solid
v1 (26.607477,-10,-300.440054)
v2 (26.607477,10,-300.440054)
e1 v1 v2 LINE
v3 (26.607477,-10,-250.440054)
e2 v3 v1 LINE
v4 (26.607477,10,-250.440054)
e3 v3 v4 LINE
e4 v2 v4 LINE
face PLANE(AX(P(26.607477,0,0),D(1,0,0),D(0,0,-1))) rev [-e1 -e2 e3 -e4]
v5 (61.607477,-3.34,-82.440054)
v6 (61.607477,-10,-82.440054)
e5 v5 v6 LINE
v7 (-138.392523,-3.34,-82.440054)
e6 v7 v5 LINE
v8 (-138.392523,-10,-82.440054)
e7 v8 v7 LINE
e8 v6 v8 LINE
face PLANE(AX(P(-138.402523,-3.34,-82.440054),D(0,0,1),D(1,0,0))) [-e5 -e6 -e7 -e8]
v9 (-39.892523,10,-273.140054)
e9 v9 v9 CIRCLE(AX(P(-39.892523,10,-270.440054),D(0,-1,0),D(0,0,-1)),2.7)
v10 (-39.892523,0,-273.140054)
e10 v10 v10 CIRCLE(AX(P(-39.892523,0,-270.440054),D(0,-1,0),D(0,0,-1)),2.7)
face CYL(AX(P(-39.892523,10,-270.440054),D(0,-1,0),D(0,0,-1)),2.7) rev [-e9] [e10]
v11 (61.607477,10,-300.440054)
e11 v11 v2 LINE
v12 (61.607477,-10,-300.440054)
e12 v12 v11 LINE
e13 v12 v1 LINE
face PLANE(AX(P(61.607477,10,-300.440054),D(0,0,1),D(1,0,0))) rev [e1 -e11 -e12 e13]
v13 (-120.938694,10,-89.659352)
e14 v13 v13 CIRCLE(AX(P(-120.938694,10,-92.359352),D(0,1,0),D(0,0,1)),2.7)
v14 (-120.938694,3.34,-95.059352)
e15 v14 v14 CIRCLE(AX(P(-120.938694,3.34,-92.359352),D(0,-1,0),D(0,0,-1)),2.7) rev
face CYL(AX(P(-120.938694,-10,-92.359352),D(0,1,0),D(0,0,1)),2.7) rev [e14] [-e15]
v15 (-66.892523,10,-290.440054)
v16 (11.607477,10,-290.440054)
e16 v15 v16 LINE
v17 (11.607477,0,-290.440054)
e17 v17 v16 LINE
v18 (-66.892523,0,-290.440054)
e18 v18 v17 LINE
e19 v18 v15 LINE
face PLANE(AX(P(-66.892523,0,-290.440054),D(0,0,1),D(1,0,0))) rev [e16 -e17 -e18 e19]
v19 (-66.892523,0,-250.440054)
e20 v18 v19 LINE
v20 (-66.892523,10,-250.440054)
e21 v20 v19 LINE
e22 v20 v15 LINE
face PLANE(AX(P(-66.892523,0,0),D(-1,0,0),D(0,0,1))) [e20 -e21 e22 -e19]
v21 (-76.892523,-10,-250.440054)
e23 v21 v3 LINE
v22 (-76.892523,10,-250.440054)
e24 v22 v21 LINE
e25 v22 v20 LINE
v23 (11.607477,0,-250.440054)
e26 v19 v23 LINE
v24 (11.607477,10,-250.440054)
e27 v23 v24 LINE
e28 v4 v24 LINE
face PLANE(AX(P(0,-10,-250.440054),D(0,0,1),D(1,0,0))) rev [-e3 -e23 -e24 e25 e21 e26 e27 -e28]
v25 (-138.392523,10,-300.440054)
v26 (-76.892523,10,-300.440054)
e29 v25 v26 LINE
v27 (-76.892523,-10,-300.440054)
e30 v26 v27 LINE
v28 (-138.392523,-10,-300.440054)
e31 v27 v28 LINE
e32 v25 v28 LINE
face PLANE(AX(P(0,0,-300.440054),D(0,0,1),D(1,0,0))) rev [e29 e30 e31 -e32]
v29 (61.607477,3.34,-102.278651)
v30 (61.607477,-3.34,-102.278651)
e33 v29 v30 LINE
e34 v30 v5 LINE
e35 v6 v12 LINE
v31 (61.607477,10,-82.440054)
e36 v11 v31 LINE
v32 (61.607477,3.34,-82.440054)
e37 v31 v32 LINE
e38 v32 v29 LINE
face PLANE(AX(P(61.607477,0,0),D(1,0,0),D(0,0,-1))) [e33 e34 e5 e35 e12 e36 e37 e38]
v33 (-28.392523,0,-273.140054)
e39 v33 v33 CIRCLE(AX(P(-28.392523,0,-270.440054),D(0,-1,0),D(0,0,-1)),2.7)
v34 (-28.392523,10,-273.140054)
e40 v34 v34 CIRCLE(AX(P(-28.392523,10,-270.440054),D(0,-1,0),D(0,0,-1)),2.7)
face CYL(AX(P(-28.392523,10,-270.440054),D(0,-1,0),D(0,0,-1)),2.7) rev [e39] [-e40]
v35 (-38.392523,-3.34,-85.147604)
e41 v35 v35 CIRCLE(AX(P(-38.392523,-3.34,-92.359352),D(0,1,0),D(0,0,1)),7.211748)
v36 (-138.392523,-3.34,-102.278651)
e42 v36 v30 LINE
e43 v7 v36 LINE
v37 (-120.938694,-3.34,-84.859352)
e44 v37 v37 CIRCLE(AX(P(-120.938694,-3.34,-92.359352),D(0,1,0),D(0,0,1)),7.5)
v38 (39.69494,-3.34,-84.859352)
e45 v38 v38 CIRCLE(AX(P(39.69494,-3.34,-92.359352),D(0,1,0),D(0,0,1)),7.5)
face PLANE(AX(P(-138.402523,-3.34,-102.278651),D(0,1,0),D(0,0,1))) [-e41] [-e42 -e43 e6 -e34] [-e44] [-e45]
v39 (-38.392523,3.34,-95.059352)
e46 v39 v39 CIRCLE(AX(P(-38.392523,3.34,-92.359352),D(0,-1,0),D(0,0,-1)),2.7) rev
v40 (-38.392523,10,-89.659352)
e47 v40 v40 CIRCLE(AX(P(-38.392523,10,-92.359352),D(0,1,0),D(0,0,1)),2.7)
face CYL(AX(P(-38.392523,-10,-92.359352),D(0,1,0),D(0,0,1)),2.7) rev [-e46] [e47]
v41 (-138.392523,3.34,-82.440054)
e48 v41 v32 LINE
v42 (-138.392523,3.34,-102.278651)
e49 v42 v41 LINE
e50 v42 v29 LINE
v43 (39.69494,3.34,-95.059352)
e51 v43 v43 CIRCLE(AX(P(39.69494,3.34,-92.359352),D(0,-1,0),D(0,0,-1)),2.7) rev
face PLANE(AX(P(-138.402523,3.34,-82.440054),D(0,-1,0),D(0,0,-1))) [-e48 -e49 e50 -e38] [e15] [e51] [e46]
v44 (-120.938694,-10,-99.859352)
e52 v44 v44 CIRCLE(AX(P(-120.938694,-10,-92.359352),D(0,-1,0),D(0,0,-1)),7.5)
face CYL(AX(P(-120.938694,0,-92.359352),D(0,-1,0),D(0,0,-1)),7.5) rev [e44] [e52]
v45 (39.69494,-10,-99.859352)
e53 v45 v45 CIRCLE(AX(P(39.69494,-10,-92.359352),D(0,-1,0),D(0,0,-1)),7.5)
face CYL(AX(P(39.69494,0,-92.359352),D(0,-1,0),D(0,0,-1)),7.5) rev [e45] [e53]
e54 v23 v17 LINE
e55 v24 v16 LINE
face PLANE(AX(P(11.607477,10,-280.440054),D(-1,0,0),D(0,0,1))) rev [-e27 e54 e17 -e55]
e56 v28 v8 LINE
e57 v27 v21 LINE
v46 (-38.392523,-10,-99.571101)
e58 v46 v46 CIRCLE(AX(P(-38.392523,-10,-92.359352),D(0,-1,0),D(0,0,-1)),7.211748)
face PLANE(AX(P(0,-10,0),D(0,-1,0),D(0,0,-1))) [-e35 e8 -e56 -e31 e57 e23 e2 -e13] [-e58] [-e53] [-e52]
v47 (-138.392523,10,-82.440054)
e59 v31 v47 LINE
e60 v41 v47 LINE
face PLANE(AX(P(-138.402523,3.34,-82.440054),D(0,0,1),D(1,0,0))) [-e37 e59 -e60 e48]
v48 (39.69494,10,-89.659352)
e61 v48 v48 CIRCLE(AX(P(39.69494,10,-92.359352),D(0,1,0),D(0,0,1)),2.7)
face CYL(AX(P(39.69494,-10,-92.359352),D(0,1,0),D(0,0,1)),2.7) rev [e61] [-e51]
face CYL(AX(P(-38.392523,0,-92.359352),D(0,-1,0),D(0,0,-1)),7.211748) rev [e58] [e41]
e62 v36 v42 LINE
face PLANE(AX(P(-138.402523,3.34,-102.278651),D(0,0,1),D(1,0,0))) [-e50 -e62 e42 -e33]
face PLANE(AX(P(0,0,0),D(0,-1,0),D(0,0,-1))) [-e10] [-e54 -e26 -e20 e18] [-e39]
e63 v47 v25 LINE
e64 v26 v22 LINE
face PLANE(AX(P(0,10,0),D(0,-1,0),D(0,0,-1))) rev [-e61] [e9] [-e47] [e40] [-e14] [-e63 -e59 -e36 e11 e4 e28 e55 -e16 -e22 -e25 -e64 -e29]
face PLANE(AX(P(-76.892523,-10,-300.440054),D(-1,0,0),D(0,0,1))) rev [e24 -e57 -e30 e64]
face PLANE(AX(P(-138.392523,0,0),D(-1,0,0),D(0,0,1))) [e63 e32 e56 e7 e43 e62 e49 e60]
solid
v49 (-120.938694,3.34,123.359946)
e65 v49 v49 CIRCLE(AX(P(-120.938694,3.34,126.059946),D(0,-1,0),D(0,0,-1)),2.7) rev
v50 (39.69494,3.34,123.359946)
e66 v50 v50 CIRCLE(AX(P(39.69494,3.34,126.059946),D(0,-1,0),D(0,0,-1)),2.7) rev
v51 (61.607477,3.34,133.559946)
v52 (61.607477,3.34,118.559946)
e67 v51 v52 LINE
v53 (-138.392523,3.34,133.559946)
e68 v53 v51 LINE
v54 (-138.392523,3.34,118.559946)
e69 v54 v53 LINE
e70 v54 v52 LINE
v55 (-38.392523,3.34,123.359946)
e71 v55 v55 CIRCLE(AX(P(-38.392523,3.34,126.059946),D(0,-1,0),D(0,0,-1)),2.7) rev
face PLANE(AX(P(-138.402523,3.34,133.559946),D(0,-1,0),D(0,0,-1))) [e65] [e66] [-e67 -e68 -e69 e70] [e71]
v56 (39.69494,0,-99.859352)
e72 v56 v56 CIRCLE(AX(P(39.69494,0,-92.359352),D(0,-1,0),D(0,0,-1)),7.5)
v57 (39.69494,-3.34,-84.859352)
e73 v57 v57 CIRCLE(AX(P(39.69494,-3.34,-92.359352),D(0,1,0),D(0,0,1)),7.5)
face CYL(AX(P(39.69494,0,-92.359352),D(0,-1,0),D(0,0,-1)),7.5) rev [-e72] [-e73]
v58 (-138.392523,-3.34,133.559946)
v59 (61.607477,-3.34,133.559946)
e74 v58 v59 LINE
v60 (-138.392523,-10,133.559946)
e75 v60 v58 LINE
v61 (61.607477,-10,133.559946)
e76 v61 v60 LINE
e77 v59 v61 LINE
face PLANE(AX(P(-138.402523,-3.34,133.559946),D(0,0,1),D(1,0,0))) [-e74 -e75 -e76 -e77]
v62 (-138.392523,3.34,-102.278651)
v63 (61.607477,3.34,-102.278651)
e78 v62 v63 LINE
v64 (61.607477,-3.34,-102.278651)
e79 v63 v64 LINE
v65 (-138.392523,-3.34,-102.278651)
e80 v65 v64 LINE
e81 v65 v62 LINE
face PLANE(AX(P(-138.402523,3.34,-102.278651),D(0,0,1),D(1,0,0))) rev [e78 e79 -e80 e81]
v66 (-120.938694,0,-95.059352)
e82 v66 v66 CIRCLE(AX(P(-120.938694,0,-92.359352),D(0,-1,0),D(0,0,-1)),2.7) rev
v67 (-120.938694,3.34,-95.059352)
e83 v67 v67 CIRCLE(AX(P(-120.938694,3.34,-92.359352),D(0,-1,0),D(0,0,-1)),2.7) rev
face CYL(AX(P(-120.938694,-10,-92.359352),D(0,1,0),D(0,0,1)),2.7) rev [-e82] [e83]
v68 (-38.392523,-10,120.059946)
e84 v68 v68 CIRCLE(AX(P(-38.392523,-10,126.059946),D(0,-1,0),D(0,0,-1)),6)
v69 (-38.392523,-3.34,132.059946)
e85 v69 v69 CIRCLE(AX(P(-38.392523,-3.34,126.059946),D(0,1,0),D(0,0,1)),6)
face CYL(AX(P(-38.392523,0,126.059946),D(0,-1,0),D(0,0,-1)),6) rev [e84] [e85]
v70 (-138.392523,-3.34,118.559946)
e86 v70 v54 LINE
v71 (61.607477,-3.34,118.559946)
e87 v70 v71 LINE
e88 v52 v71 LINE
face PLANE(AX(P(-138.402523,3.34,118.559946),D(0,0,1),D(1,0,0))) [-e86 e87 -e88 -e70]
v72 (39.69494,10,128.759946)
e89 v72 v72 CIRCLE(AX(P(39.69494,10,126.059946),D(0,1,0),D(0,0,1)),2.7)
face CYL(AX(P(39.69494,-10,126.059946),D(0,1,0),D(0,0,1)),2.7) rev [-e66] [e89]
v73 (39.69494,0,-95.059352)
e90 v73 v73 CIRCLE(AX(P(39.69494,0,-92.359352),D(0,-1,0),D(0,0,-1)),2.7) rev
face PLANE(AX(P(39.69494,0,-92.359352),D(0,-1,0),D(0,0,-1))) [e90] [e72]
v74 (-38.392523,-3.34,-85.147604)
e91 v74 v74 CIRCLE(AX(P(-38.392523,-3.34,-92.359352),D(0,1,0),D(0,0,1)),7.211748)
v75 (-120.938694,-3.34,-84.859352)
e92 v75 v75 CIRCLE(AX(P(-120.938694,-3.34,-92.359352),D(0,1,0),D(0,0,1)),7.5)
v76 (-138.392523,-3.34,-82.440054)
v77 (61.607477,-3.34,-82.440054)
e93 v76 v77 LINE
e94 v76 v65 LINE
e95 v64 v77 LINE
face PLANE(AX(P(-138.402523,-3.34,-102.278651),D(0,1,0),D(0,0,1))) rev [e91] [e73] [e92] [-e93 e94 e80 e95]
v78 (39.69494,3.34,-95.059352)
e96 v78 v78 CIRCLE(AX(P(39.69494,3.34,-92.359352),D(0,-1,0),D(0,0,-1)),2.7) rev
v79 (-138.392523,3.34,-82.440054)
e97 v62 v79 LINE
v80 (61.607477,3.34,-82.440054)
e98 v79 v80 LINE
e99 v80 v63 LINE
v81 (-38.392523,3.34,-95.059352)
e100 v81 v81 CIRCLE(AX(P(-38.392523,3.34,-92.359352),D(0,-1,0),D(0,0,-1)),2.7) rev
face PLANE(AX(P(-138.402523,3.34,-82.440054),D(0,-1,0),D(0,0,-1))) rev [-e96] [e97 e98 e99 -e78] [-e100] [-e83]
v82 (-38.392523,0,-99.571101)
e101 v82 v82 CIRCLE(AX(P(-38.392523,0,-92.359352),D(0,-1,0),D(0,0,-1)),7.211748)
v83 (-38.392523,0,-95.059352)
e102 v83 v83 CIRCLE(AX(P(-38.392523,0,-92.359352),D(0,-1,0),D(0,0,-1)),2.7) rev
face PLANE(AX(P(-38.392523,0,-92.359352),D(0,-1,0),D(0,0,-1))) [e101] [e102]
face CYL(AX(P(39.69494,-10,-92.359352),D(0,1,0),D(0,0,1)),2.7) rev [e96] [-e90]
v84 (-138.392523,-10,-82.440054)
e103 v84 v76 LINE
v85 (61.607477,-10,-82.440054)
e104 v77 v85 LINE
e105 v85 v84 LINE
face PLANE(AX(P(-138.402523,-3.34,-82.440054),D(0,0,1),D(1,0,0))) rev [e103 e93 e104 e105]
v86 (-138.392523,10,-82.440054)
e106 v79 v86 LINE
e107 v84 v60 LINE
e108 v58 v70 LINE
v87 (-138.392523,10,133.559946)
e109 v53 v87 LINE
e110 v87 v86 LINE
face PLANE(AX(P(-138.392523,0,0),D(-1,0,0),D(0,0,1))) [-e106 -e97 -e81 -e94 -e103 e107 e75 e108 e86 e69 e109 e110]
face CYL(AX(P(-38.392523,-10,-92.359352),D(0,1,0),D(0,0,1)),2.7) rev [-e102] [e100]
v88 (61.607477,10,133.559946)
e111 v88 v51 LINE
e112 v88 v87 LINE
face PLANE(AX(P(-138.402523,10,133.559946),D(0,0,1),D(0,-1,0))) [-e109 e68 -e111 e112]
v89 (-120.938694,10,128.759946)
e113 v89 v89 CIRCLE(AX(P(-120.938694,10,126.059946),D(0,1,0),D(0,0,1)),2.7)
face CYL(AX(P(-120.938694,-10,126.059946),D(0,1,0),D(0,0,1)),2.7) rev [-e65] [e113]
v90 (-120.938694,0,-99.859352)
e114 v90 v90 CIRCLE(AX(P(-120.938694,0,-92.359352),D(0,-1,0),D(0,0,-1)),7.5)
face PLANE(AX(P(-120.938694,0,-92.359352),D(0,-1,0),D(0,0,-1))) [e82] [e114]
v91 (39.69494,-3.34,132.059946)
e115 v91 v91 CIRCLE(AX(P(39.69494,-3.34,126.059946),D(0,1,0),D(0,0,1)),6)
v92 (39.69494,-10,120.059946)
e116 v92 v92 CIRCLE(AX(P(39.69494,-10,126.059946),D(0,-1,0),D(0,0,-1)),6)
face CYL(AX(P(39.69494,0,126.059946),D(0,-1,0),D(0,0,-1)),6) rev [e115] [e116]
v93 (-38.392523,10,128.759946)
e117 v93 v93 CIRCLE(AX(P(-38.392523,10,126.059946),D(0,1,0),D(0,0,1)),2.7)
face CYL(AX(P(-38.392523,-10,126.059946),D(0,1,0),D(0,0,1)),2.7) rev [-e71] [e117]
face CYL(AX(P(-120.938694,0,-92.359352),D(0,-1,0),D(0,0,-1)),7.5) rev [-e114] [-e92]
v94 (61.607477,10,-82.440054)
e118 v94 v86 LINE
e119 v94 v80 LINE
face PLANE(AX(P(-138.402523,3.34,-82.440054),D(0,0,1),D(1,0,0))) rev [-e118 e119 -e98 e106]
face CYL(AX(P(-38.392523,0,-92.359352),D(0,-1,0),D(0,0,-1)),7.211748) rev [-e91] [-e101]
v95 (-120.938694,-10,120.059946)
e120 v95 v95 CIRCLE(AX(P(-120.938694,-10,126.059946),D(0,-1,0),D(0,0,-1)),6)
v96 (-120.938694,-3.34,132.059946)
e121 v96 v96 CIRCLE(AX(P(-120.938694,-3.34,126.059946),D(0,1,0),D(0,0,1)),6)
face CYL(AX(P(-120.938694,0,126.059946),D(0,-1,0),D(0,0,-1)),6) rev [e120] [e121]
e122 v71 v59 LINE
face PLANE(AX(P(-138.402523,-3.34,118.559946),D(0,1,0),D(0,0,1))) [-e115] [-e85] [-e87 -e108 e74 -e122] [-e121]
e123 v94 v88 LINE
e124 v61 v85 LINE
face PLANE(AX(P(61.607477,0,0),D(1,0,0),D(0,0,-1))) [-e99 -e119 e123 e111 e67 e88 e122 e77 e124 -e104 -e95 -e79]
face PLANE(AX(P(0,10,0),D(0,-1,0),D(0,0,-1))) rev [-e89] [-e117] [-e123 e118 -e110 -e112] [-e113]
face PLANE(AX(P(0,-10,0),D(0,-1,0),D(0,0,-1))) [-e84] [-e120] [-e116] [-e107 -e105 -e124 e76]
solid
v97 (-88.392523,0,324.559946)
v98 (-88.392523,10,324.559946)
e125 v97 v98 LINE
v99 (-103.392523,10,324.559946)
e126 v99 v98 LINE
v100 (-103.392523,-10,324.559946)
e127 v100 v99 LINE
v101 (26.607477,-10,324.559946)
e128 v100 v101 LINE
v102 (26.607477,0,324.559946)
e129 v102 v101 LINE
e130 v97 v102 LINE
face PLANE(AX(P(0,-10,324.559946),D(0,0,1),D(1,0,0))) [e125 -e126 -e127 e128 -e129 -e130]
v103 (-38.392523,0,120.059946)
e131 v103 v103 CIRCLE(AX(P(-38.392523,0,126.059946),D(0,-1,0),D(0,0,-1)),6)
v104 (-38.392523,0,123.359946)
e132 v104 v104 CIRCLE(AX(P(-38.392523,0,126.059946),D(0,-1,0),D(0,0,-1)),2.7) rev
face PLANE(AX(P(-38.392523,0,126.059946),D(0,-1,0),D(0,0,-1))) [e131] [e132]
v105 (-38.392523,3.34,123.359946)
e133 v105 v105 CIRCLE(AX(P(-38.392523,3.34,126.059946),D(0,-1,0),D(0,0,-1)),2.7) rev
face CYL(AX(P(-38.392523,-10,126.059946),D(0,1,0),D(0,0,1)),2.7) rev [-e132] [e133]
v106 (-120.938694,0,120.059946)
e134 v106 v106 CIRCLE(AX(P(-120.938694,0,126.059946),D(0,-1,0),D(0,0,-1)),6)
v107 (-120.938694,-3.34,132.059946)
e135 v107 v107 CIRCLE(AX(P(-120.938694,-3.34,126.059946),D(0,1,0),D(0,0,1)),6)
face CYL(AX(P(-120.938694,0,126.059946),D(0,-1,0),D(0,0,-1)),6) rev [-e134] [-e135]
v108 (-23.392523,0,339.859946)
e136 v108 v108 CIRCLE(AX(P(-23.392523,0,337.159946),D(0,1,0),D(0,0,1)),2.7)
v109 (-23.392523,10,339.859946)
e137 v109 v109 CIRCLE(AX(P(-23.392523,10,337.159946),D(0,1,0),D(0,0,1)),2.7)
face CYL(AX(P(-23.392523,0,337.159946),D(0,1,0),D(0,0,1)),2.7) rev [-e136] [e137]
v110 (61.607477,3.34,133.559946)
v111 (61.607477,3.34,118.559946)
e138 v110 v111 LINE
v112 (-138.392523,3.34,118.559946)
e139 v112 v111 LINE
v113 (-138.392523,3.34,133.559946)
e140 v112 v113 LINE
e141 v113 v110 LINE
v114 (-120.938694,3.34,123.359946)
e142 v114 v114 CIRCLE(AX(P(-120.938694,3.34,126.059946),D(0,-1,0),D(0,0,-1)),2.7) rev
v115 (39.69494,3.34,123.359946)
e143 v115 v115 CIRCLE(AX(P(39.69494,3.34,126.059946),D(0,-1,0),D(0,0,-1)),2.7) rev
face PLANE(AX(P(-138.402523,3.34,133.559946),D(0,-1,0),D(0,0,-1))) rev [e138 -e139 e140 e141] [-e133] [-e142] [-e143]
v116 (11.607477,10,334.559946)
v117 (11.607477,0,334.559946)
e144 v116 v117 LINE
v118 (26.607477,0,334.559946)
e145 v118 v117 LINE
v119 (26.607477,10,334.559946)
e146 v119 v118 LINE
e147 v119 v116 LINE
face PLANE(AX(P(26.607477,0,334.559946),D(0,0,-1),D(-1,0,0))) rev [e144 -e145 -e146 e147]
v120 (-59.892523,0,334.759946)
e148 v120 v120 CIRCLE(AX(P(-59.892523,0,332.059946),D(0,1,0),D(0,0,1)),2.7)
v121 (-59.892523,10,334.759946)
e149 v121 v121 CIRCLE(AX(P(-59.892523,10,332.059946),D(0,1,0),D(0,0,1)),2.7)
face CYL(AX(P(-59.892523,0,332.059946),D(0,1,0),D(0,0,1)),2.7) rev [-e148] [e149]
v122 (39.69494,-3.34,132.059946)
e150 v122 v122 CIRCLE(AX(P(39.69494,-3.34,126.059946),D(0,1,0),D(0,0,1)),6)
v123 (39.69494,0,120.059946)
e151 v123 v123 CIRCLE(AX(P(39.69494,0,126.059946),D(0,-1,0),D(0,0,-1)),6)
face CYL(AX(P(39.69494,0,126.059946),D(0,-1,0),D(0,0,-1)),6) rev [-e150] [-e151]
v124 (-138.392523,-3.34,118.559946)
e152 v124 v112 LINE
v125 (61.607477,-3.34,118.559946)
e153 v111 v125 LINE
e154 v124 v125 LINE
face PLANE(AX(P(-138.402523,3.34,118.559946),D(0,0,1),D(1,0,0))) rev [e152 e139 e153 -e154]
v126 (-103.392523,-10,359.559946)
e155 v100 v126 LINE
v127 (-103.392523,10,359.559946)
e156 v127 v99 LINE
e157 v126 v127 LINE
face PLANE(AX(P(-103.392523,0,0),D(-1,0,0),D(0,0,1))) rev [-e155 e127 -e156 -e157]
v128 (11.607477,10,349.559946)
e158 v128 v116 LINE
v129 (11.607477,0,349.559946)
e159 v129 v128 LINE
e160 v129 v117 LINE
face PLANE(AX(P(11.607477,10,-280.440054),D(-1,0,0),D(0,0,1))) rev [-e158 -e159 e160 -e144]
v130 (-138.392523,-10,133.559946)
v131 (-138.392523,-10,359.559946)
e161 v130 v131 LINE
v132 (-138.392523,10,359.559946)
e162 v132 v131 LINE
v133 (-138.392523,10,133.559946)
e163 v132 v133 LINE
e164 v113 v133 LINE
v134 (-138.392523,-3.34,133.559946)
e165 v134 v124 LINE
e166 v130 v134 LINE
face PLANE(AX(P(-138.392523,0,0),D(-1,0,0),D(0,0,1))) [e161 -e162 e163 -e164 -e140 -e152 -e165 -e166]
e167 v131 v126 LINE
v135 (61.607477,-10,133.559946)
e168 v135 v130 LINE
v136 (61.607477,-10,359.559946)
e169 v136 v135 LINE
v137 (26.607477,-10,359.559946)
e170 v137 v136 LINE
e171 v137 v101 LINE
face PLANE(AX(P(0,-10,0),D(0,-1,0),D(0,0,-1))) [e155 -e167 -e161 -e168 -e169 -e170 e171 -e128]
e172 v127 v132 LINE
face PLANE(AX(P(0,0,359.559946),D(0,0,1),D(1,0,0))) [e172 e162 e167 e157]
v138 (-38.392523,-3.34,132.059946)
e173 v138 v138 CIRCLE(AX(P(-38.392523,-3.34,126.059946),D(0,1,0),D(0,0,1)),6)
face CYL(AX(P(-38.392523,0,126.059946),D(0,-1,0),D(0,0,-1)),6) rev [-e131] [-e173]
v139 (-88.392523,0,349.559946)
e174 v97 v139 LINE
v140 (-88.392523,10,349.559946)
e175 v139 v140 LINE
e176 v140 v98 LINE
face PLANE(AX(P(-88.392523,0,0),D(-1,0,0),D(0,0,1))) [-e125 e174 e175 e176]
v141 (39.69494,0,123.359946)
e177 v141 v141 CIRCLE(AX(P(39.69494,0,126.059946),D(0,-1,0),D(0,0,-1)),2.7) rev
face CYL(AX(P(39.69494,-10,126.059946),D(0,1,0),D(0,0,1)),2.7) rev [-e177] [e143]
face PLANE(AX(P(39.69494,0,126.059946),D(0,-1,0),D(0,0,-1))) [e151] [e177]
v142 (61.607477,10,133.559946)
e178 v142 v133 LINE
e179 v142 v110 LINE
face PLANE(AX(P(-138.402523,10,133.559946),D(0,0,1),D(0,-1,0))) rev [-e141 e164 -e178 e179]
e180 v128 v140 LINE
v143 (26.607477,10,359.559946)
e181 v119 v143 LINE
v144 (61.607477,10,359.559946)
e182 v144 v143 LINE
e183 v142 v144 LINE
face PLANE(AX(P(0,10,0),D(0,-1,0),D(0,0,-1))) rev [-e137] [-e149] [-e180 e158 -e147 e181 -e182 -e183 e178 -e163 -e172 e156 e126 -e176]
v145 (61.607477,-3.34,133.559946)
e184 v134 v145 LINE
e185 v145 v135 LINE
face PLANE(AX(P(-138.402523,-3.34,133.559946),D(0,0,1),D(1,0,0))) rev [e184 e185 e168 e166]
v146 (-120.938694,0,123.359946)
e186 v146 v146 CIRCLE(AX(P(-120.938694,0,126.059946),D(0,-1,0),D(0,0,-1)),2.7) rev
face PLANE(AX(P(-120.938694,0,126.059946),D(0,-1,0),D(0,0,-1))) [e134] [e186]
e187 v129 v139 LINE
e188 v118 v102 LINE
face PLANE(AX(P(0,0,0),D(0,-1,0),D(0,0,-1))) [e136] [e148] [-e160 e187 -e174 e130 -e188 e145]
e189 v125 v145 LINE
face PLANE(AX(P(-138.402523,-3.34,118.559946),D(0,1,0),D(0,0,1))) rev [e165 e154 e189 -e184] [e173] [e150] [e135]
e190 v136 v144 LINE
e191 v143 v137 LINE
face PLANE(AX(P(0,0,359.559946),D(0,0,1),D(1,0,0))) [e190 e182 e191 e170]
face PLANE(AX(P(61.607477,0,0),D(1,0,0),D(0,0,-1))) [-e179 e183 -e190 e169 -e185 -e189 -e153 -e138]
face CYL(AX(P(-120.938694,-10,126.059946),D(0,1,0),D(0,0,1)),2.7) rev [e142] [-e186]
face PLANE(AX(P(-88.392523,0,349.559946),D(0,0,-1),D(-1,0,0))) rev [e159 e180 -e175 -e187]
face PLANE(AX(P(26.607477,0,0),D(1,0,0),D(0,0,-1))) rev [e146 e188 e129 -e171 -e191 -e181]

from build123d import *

# Parameters (mm, degrees)
BOSS_EXTRUDE1_DEPTH     = 10
CUT_EXTRUDE1_DEPTH      = 371.163218123
CUT_EXTRUDE1_DEPTH_BACK = 371.163218123
SKETCH2_W               = 11.607476636
SKETCH2_H               = 200
SKETCH3_W               = 10
SKETCH3_H               = 200
BOSS_EXTRUDE2_DEPTH     = 10
SKETCH4_W               = 1.61
SKETCH4_H               = 200
BOSS_EXTRUDE3_DEPTH     = 10
SKETCH5_W               = 69.002523364
SKETCH5_H               = 10
BOSS_EXTRUDE4_DEPTH     = 20
CUT_EXTRUDE2_DEPTH      = 371.163218123
CUT_EXTRUDE2_DEPTH_BACK = 371.163218123
SKETCH6_W               = 40
SKETCH6_H               = 10
SKETCH8_W               = 9.997476636
SKETCH8_H               = 10
SKETCH8_W_2             = 20
BOSS_EXTRUDE6_DEPTH     = 10
CUT_EXTRUDE3_DEPTH      = 371.163218123
CUT_EXTRUDE3_DEPTH_BACK = 371.163218123
SKETCH9_W               = 2.5
SKETCH9_H               = 210
CUT_EXTRUDE4_DEPTH      = 371.163218123
CUT_EXTRUDE4_DEPTH_BACK = 371.163218123
SKETCH10_W              = 2.5
SKETCH10_H              = 340
CUT_EXTRUDE5_DEPTH      = 370.580972771
CUT_EXTRUDE5_DEPTH_BACK = 370.580972771
SKETCH11_W              = 2.5
SKETCH11_H              = 110
SKETCH12_W              = 110
SKETCH12_H              = 10
BOSS_EXTRUDE7_DEPTH     = 43.5
SKETCH13_W              = 340
SKETCH13_H              = 10
BOSS_EXTRUDE8_DEPTH     = 3.5
SKETCH14_W              = 210
SKETCH14_H              = 10
BOSS_EXTRUDE9_DEPTH     = 2
SKETCH15_W              = 9.997476636
SKETCH15_H              = 210
BOSS_EXTRUDE10_DEPTH    = 10
CUT_EXTRUDE6_DEPTH      = 371.400584635
CUT_EXTRUDE6_DEPTH_BACK = 371.400584635
SKETCH16_W              = 21.5
SKETCH16_H              = 46.5
CUT_EXTRUDE7_DEPTH      = 371.400584635
CUT_EXTRUDE7_DEPTH_BACK = 371.400584635
SKETCH18_W              = 78.5
SKETCH18_H              = 10
SKETCH18_W_2            = 100
SKETCH19_R              = 2.7
CUT_EXTRUDE8_DEPTH      = 361.701253357
SKETCH20_R              = 2.7
CUT_EXTRUDE9_DEPTH      = 361.701253357
BOSS_EXTRUDE13_DEPTH    = 10
SKETCH24_W              = 206.5
SKETCH24_H              = 20
BOSS_EXTRUDE14_DEPTH    = 21.5
BOSS_EXTRUDE15_DEPTH    = 15
SKETCH27_W              = 575
SKETCH27_H              = 20
BOSS_EXTRUDE17_DEPTH    = 15
SKETCH28_W              = 26.5
SKETCH28_H              = 20
BOSS_EXTRUDE18_DEPTH    = 50
SKETCH30_W              = 650
SKETCH30_H              = 20
BOSS_EXTRUDE19_DEPTH    = 35
SKETCH31_W              = 650
SKETCH31_H              = 20
BOSS_EXTRUDE20_DEPTH    = 35
SKETCH35_R              = 2.7
CUT_EXTRUDE10_DEPTH     = 377.489902268
SPLIT1_START            = -10
SPLIT1_DEPTH            = 20
SPLIT1_START_2          = 3.34
SPLIT1_2_OUTLINE_W      = 200
SPLIT1_2_OUTLINE_H      = 19.838597034
SPLIT1_2_OUTLINE_R      = 2.7
SPLIT1_2_OUTLINE_W_2    = 78.5
SPLIT1_2_OUTLINE_H_2    = 40
SPLIT1_2_DEPTH          = 6.66
SPLIT1_3_OUTLINE_W      = 200
SPLIT1_3_OUTLINE_H      = 19.838597034
SPLIT1_3_OUTLINE_R      = 2.7
SPLIT1_3_DEPTH          = 6.66
SPLIT1_4_OUTLINE_W      = 78.5
SPLIT1_4_OUTLINE_H      = 40
SPLIT1_4_OUTLINE_R      = 2.7
SPLIT1_4_DEPTH          = 3.34
SPLIT1_5_OUTLINE_W      = 200
SPLIT1_5_OUTLINE_H      = 201
SPLIT1_5_DEPTH          = 20
SPLIT1_START_3          = -3.34
SPLIT1_6_OUTLINE_W      = 200
SPLIT1_6_OUTLINE_H      = 19.838597034
SPLIT1_6_OUTLINE_R      = 2.7
SPLIT1_6_DEPTH          = 6.68
SPLIT1_7_OUTLINE_W      = 200
SPLIT1_7_OUTLINE_H      = 15
SPLIT1_7_OUTLINE_R      = 2.7
SPLIT1_7_DEPTH          = 6.66
SPLIT1_8_OUTLINE_W      = 200
SPLIT1_8_OUTLINE_H      = 15
SPLIT1_8_OUTLINE_R      = 2.7
SPLIT1_8_DEPTH          = 6.66
SPLIT1_9_OUTLINE_R      = 2.7
SPLIT1_9_DEPTH          = 20
SPLIT1_10_OUTLINE_W     = 200
SPLIT1_10_OUTLINE_H     = 15
SPLIT1_10_OUTLINE_R     = 2.7
SPLIT1_10_DEPTH         = 6.66
SPLIT1_11_OUTLINE_W     = 200
SPLIT1_11_OUTLINE_H     = 15
SPLIT1_11_OUTLINE_R     = 2.7
SPLIT1_11_DEPTH         = 6.66
SKETCH36_W              = 35
SKETCH36_H              = 20
BOSS_EXTRUDE21_DEPTH    = 10
SKETCH37_R              = 7.5
SKETCH37_R_2            = 7.211748486
SKETCH37_R_3            = 6
CUT_EXTRUDE11_DEPTH     = 10


# Read off the part's stored shape, not the designer's step: Split1
with BuildPart() as part:
    # Sketch1 → Boss-Extrude1 (new body)
    with BuildSketch(Plane(origin=(0, 0, 0), x_dir=(1, 0, 0), z_dir=(0, 1, 0))):
        Polygon((-57.392523364, 280.440053801), (11.607476636, 280.440053801), (11.607476636, 80.440053801), (11.607476636, -259.559946199), (11.607476636, -359.559946199), (-47.392523364, -359.559946199), (-47.392523364, -259.559946199), (-87.392523364, -259.559946199), (-87.392523364, 80.440053801), (-57.392523364, 80.440053801), align=None)
    extrude(amount=BOSS_EXTRUDE1_DEPTH)

    # Sketch2 → Cut-Extrude1 (cut, two sides: drawn at the far end of the back side and taken through both)
    with BuildSketch(Plane(origin=(0, 10, 0), x_dir=(1, 0, 0), z_dir=(0, 1, 0)).offset(-CUT_EXTRUDE1_DEPTH_BACK)):
        with Locations((5.803738318, 180.440053801)):
            Rectangle(SKETCH2_W, SKETCH2_H)
    extrude(amount=CUT_EXTRUDE1_DEPTH + CUT_EXTRUDE1_DEPTH_BACK, mode=Mode.SUBTRACT)

    # Sketch3 → Boss-Extrude2 (add)
    with BuildSketch(Plane(origin=(0, 10, 0), x_dir=(1, 0, 0), z_dir=(0, 1, 0))):
        with Locations((-62.392523364, 180.440053801)):
            Rectangle(SKETCH3_W, SKETCH3_H)
    extrude(amount=-BOSS_EXTRUDE2_DEPTH)

    # Sketch4 → Boss-Extrude3 (add)
    with BuildSketch(Plane(origin=(0, 10, 0), x_dir=(1, 0, 0), z_dir=(0, 1, 0))):
        with Locations((0.805, 180.440053801)):
            Rectangle(SKETCH4_W, SKETCH4_H)
    extrude(amount=-BOSS_EXTRUDE3_DEPTH)

    # Sketch5 → Boss-Extrude4 (add)
    with BuildSketch(Plane(origin=(0, 0, -280.440053801), x_dir=(-1, 0, 0), z_dir=(0, 0, -1))):
        with Locations((32.891261682, 5)):
            Rectangle(SKETCH5_W, SKETCH5_H)
    extrude(amount=BOSS_EXTRUDE4_DEPTH)

    # Sketch6 → Cut-Extrude2 (cut, two sides: drawn at the far end of the back side and taken through both)
    with BuildSketch(Plane(origin=(0, 10, 0), x_dir=(1, 0, 0), z_dir=(0, 1, 0)).offset(-CUT_EXTRUDE2_DEPTH_BACK)):
        with Locations((-67.392523364, -254.559946199)):
            Rectangle(SKETCH6_W, SKETCH6_H)
    extrude(amount=CUT_EXTRUDE2_DEPTH + CUT_EXTRUDE2_DEPTH_BACK, mode=Mode.SUBTRACT)

    # Sketch8 → Boss-Extrude6 (add)
    with BuildSketch(Plane(origin=(0, 0, -80.440053801), x_dir=(-1, 0, 0), z_dir=(0, 0, -1))):
        with Locations((-6.608738318, 5)):
            Rectangle(SKETCH8_W, SKETCH8_H)
        with Locations((77.392523364, 5)):
            Rectangle(SKETCH8_W_2, SKETCH8_H)
    extrude(amount=BOSS_EXTRUDE6_DEPTH)

    # Sketch9 → Cut-Extrude3 (cut, two sides: drawn at the far end of the back side and taken through both)
    with BuildSketch(Plane(origin=(0, 10, 0), x_dir=(1, 0, 0), z_dir=(0, 1, 0)).offset(-CUT_EXTRUDE3_DEPTH_BACK)):
        with Locations((-66.142523364, 195.440053801)):
            Rectangle(SKETCH9_W, SKETCH9_H)
    extrude(amount=CUT_EXTRUDE3_DEPTH + CUT_EXTRUDE3_DEPTH_BACK, mode=Mode.SUBTRACT)

    # Sketch10 → Cut-Extrude4 (cut, two sides: drawn at the far end of the back side and taken through both)
    with BuildSketch(Plane(origin=(0, 10, 0), x_dir=(1, 0, 0), z_dir=(0, 1, 0)).offset(-CUT_EXTRUDE4_DEPTH_BACK)):
        with Locations((-86.142523364, -79.559946199)):
            Rectangle(SKETCH10_W, SKETCH10_H)
    extrude(amount=CUT_EXTRUDE4_DEPTH + CUT_EXTRUDE4_DEPTH_BACK, mode=Mode.SUBTRACT)

    # Sketch11 → Cut-Extrude5 (cut, two sides: drawn at the far end of the back side and taken through both)
    with BuildSketch(Plane(origin=(0, 10, 0), x_dir=(1, 0, 0), z_dir=(0, 1, 0)).offset(-CUT_EXTRUDE5_DEPTH_BACK)):
        with Locations((-46.142523364, -304.559946199)):
            Rectangle(SKETCH11_W, SKETCH11_H)
    extrude(amount=CUT_EXTRUDE5_DEPTH + CUT_EXTRUDE5_DEPTH_BACK, mode=Mode.SUBTRACT)

    # Sketch12 → Boss-Extrude7 (add)
    with BuildSketch(Plane.ZY.offset(44.892523364)):
        with Locations((304.559946199, 5)):
            Rectangle(SKETCH12_W, SKETCH12_H)
    extrude(amount=BOSS_EXTRUDE7_DEPTH)

    # Sketch13 → Boss-Extrude8 (add)
    with BuildSketch(Plane.ZY.offset(84.892523364)):
        with Locations((79.559946199, 5)):
            Rectangle(SKETCH13_W, SKETCH13_H)
    extrude(amount=BOSS_EXTRUDE8_DEPTH)

    # Sketch14 → Boss-Extrude9 (add)
    with BuildSketch(Plane.ZY.offset(64.892523364)):
        with Locations((-195.440053801, 5)):
            Rectangle(SKETCH14_W, SKETCH14_H)
    extrude(amount=BOSS_EXTRUDE9_DEPTH)

    # Sketch15 → Boss-Extrude10 (add)
    with BuildSketch(Plane(origin=(0, 10, 0), x_dir=(1, 0, 0), z_dir=(0, 1, 0))):
        with Locations((6.608738318, 195.440053801)):
            Rectangle(SKETCH15_W, SKETCH15_H)
    extrude(amount=-BOSS_EXTRUDE10_DEPTH)

    # Sketch16 → Cut-Extrude6 (cut, two sides: drawn at the far end of the back side and taken through both)
    with BuildSketch(Plane(origin=(0, 10, 0), x_dir=(1, 0, 0), z_dir=(0, 1, 0)).offset(-CUT_EXTRUDE6_DEPTH_BACK)):
        with Locations((-77.642523364, 67.190053801)):
            Rectangle(SKETCH16_W, SKETCH16_H)
    extrude(amount=CUT_EXTRUDE6_DEPTH + CUT_EXTRUDE6_DEPTH_BACK, mode=Mode.SUBTRACT)

    # Sketch18 → Cut-Extrude7 (cut, two sides: drawn at the far end of the back side and taken through both)
    with BuildSketch(Plane(origin=(0, 10, 0), x_dir=(1, 0, 0), z_dir=(0, 1, 0)).offset(-CUT_EXTRUDE7_DEPTH_BACK)):
        with Locations((-27.642523364, 295.440053801)):
            Rectangle(SKETCH18_W, SKETCH18_H)
        with Locations((-38.392523364, -354.559946199)):
            Rectangle(SKETCH18_W_2, SKETCH18_H)
    extrude(amount=CUT_EXTRUDE7_DEPTH + CUT_EXTRUDE7_DEPTH_BACK, mode=Mode.SUBTRACT)

    # Sketch19 → Cut-Extrude8 (cut, through all)
    with BuildSketch(Plane(origin=(0, 10, 0), x_dir=(1, 0, 0), z_dir=(0, 1, 0))):
        with Locations(Location((-23.392523364, -337.159946199, 0), (0, 0, 270))):
            Circle(SKETCH19_R)
        with Locations(Location((-59.892523364, -332.059946199, 0), (0, 0, 270))):
            Circle(SKETCH19_R)
    extrude(amount=-CUT_EXTRUDE8_DEPTH, mode=Mode.SUBTRACT)

    # Sketch20 → Cut-Extrude9 (cut, through all)
    with BuildSketch(Plane.XZ):
        with Locations(Location((-39.892523364, -270.440053801, 0), (0, 0, 270))):
            Circle(SKETCH20_R)
        with Locations(Location((-28.392523364, -270.440053801, 0), (0, 0, 270))):
            Circle(SKETCH20_R)
    extrude(amount=-CUT_EXTRUDE9_DEPTH, mode=Mode.SUBTRACT)

    # Sketch21 → Boss-Extrude13 (add)
    with BuildSketch(Plane.XZ):
        Polygon((11.607476636, 324.559946199), (-88.392523364, 324.559946199), (-88.392523364, -43.940053801), (-66.892523364, -43.940053801), (-66.892523364, -250.440053801), (11.607476636, -250.440053801), align=None)
    extrude(amount=BOSS_EXTRUDE13_DEPTH)

    # Sketch24 → Boss-Extrude14 (add)
    with BuildSketch(Plane.ZY.offset(66.892523364)):
        with Locations((-147.190053801, 0)):
            Rectangle(SKETCH24_W, SKETCH24_H)
    extrude(amount=BOSS_EXTRUDE14_DEPTH)

    # Sketch25 → Boss-Extrude15 (add)
    with BuildSketch(Plane(origin=(11.607476636, 0, 0), x_dir=(0, 0, -1), z_dir=(1, 0, 0))):
        Polygon((250.440053801, -10), (-324.559946199, -10), (-324.559946199, 0), (-334.559946199, 0), (-334.559946199, 10), (-324.559946199, 10), (250.440053801, 10), (250.440053801, 0), align=None)
    extrude(amount=BOSS_EXTRUDE15_DEPTH)

    # Sketch27 → Boss-Extrude17 (add)
    with BuildSketch(Plane.ZY.offset(88.392523364)):
        with Locations((37.059946199, 0)):
            Rectangle(SKETCH27_W, SKETCH27_H)
    extrude(amount=BOSS_EXTRUDE17_DEPTH)

    # Sketch28 → Boss-Extrude18 (add)
    with BuildSketch(Plane(origin=(0, 0, -250.440053801), x_dir=(-1, 0, 0), z_dir=(0, 0, -1))):
        with Locations((90.142523364, 0)):
            Rectangle(SKETCH28_W, SKETCH28_H)
    extrude(amount=BOSS_EXTRUDE18_DEPTH)

    # Sketch30 → Boss-Extrude19 (add)
    with BuildSketch(Plane.ZY.offset(103.392523364)):
        with Locations((24.559946199, 0)):
            Rectangle(SKETCH30_W, SKETCH30_H)
    extrude(amount=BOSS_EXTRUDE19_DEPTH)

    # Sketch31 → Boss-Extrude20 (add)
    with BuildSketch(Plane(origin=(26.607476636, 0, 0), x_dir=(0, 0, -1), z_dir=(1, 0, 0))):
        with Locations((-24.559946199, 0)):
            Rectangle(SKETCH31_W, SKETCH31_H)
    extrude(amount=BOSS_EXTRUDE20_DEPTH)

    # Sketch35 → Cut-Extrude10 (cut, through all)
    with BuildSketch(Plane(origin=(0, 10, 0), x_dir=(1, 0, 0), z_dir=(0, 1, 0))):
        with Locations(Location((-120.938694043, 92.359352318, 0), (0, 0, 270))):
            Circle(SKETCH35_R)
        with Locations(Location((-38.392523364, 92.359352318, 0), (0, 0, 270))):
            Circle(SKETCH35_R)
        with Locations(Location((39.694940335, 92.359352318, 0), (0, 0, 270))):
            Circle(SKETCH35_R)
        with Locations(Location((-120.938694043, -126.059946199, 0), (0, 0, 270))):
            Circle(SKETCH35_R)
        with Locations(Location((-38.392523364, -126.059946199, 0), (0, 0, 270))):
            Circle(SKETCH35_R)
        with Locations(Location((39.694940335, -126.059946199, 0), (0, 0, 270))):
            Circle(SKETCH35_R)
    extrude(amount=-CUT_EXTRUDE10_DEPTH, mode=Mode.SUBTRACT)

    # Split1 9 outline → Split1 9 (cut)
    with BuildSketch(Plane(origin=(0, 0, 0), x_dir=(1, 0, 0), z_dir=(0, 1, 0)).offset(SPLIT1_START)):
        Polygon((-138.392523364, 300.440053801), (-138.392523364, -118.559946199), (61.607476636, -118.559946199), (61.607476636, 300.440053801), (26.607476636, 300.440053801), (26.607476636, 250.440053801), (11.607476636, 250.440053801), (11.607476636, 290.440053801), (-66.892523364, 290.440053801), (-66.892523364, 250.440053801), (-76.892523364, 250.440053801), (-76.892523364, 300.440053801), align=None)
        with Locations((-120.938694043, 92.359352318)):
            Circle(SPLIT1_9_OUTLINE_R, mode=Mode.SUBTRACT)
        with Locations((-38.392523364, 92.359352318)):
            Circle(SPLIT1_9_OUTLINE_R, mode=Mode.SUBTRACT)
        with Locations((39.694940335, 92.359352318)):
            Circle(SPLIT1_9_OUTLINE_R, mode=Mode.SUBTRACT)
        with Locations((-28.392523364, 270.440053801)):
            Circle(SPLIT1_9_OUTLINE_R, mode=Mode.SUBTRACT)
        with Locations((-39.892523364, 270.440053801)):
            Circle(SPLIT1_9_OUTLINE_R, mode=Mode.SUBTRACT)
    extrude(amount=SPLIT1_9_DEPTH, mode=Mode.SUBTRACT)

    # Split1 10 outline → Split1 10 (cut)
    with BuildSketch(Plane(origin=(0, 0, 0), x_dir=(1, 0, 0), z_dir=(0, 1, 0)).offset(SPLIT1_START)):
        with Locations((-38.392523364, -126.059946199)):
            Rectangle(SPLIT1_10_OUTLINE_W, SPLIT1_10_OUTLINE_H)
        with Locations((-120.938694043, -126.059946199)):
            Circle(SPLIT1_10_OUTLINE_R, mode=Mode.SUBTRACT)
        with Locations((-38.392523364, -126.059946199)):
            Circle(SPLIT1_10_OUTLINE_R, mode=Mode.SUBTRACT)
        with Locations((39.694940335, -126.059946199)):
            Circle(SPLIT1_10_OUTLINE_R, mode=Mode.SUBTRACT)
    extrude(amount=SPLIT1_10_DEPTH, mode=Mode.SUBTRACT)

    # Split1 11 outline → Split1 11 (cut)
    with BuildSketch(Plane(origin=(0, 0, 0), x_dir=(1, 0, 0), z_dir=(0, 1, 0)).offset(SPLIT1_START_2)):
        with Locations((-38.392523364, -126.059946199)):
            Rectangle(SPLIT1_11_OUTLINE_W, SPLIT1_11_OUTLINE_H)
        with Locations((-120.938694043, -126.059946199)):
            Circle(SPLIT1_11_OUTLINE_R, mode=Mode.SUBTRACT)
        with Locations((-38.392523364, -126.059946199)):
            Circle(SPLIT1_11_OUTLINE_R, mode=Mode.SUBTRACT)
        with Locations((39.694940335, -126.059946199)):
            Circle(SPLIT1_11_OUTLINE_R, mode=Mode.SUBTRACT)
    extrude(amount=SPLIT1_11_DEPTH, mode=Mode.SUBTRACT)

    # Sketch36 → Boss-Extrude21 (add)
    with BuildSketch(Plane.XY.offset(349.559946199)):
        with Locations((-120.892523364, 0)):
            Rectangle(SKETCH36_W, SKETCH36_H)
        with Locations((44.107476636, 0)):
            Rectangle(SKETCH36_W, SKETCH36_H)
    extrude(amount=BOSS_EXTRUDE21_DEPTH)


with BuildPart() as body_2:
    # Split1 outline → Split1 (new body)
    with BuildSketch(Plane(origin=(0, 0, 0), x_dir=(1, 0, 0), z_dir=(0, 1, 0)).offset(SPLIT1_START)):
        Polygon((-138.392523364, 300.440053801), (-138.392523364, 102.278650835), (61.607476636, 102.278650835), (61.607476636, 300.440053801), (26.607476636, 300.440053801), (26.607476636, 250.440053801), (-76.892523364, 250.440053801), (-76.892523364, 300.440053801), align=None)
    extrude(amount=SPLIT1_DEPTH)

    # Split1 2 outline → Split1 2 (add)
    # profile 1 of 2: a face of its own
    with BuildSketch(Plane(origin=(0, 0, 0), x_dir=(1, 0, 0), z_dir=(0, 1, 0)).offset(SPLIT1_START_2)):
        with Locations((-38.392523364, 92.359352318)):
            Rectangle(SPLIT1_2_OUTLINE_W, SPLIT1_2_OUTLINE_H)
        with Locations((-120.938694043, 92.359352318)):
            Circle(SPLIT1_2_OUTLINE_R, mode=Mode.SUBTRACT)
        with Locations((-38.392523364, 92.359352318)):
            Circle(SPLIT1_2_OUTLINE_R, mode=Mode.SUBTRACT)
        with Locations((39.694940335, 92.359352318)):
            Circle(SPLIT1_2_OUTLINE_R, mode=Mode.SUBTRACT)
    # profile 2 of 2: a face of its own
    with BuildSketch(Plane(origin=(0, 0, 0), x_dir=(1, 0, 0), z_dir=(0, 1, 0)).offset(SPLIT1_START_2)):
        with Locations((-27.642523364, 270.440053801)):
            Rectangle(SPLIT1_2_OUTLINE_W_2, SPLIT1_2_OUTLINE_H_2)
        with Locations((-39.892523364, 270.440053801)):
            Circle(SPLIT1_2_OUTLINE_R, mode=Mode.SUBTRACT)
        with Locations((-28.392523364, 270.440053801)):
            Circle(SPLIT1_2_OUTLINE_R, mode=Mode.SUBTRACT)
    extrude(amount=SPLIT1_2_DEPTH)

    # Split1 3 outline → Split1 3 (add)
    with BuildSketch(Plane(origin=(0, 0, 0), x_dir=(1, 0, 0), z_dir=(0, 1, 0)).offset(SPLIT1_START)):
        with Locations((-38.392523364, 92.359352318)):
            Rectangle(SPLIT1_3_OUTLINE_W, SPLIT1_3_OUTLINE_H)
        with Locations((-120.938694043, 92.359352318)):
            Circle(SPLIT1_3_OUTLINE_R, mode=Mode.SUBTRACT)
        with Locations((-38.392523364, 92.359352318)):
            Circle(SPLIT1_3_OUTLINE_R, mode=Mode.SUBTRACT)
        with Locations((39.694940335, 92.359352318)):
            Circle(SPLIT1_3_OUTLINE_R, mode=Mode.SUBTRACT)
    extrude(amount=SPLIT1_3_DEPTH)

    # Split1 4 outline → Split1 4 (add)
    with BuildSketch(Plane(origin=(0, 0, 0), x_dir=(1, 0, 0), z_dir=(0, 1, 0))):
        with Locations((-27.642523364, 270.440053801)):
            Rectangle(SPLIT1_4_OUTLINE_W, SPLIT1_4_OUTLINE_H)
        with Locations((-39.892523364, 270.440053801)):
            Circle(SPLIT1_4_OUTLINE_R, mode=Mode.SUBTRACT)
        with Locations((-28.392523364, 270.440053801)):
            Circle(SPLIT1_4_OUTLINE_R, mode=Mode.SUBTRACT)
    extrude(amount=SPLIT1_4_DEPTH)


with BuildPart() as body_3:
    # Split1 5 outline → Split1 5 (new body)
    with BuildSketch(Plane(origin=(0, 0, 0), x_dir=(1, 0, 0), z_dir=(0, 1, 0)).offset(SPLIT1_START)):
        with Locations((-38.392523364, -18.059946199)):
            Rectangle(SPLIT1_5_OUTLINE_W, SPLIT1_5_OUTLINE_H)
    extrude(amount=SPLIT1_5_DEPTH)

    # Split1 6 outline → Split1 6 (add)
    with BuildSketch(Plane(origin=(0, 0, 0), x_dir=(1, 0, 0), z_dir=(0, 1, 0)).offset(SPLIT1_START_3)):
        with Locations((-38.392523364, 92.359352318)):
            Rectangle(SPLIT1_6_OUTLINE_W, SPLIT1_6_OUTLINE_H)
        with Locations((-120.938694043, 92.359352318)):
            Circle(SPLIT1_6_OUTLINE_R, mode=Mode.SUBTRACT)
        with Locations((-38.392523364, 92.359352318)):
            Circle(SPLIT1_6_OUTLINE_R, mode=Mode.SUBTRACT)
        with Locations((39.694940335, 92.359352318)):
            Circle(SPLIT1_6_OUTLINE_R, mode=Mode.SUBTRACT)
    extrude(amount=SPLIT1_6_DEPTH)

    # Split1 7 outline → Split1 7 (add)
    with BuildSketch(Plane(origin=(0, 0, 0), x_dir=(1, 0, 0), z_dir=(0, 1, 0)).offset(SPLIT1_START)):
        with Locations((-38.392523364, -126.059946199)):
            Rectangle(SPLIT1_7_OUTLINE_W, SPLIT1_7_OUTLINE_H)
        with Locations((-120.938694043, -126.059946199)):
            Circle(SPLIT1_7_OUTLINE_R, mode=Mode.SUBTRACT)
        with Locations((-38.392523364, -126.059946199)):
            Circle(SPLIT1_7_OUTLINE_R, mode=Mode.SUBTRACT)
        with Locations((39.694940335, -126.059946199)):
            Circle(SPLIT1_7_OUTLINE_R, mode=Mode.SUBTRACT)
    extrude(amount=SPLIT1_7_DEPTH)

    # Split1 8 outline → Split1 8 (add)
    with BuildSketch(Plane(origin=(0, 0, 0), x_dir=(1, 0, 0), z_dir=(0, 1, 0)).offset(SPLIT1_START_2)):
        with Locations((-38.392523364, -126.059946199)):
            Rectangle(SPLIT1_8_OUTLINE_W, SPLIT1_8_OUTLINE_H)
        with Locations((-120.938694043, -126.059946199)):
            Circle(SPLIT1_8_OUTLINE_R, mode=Mode.SUBTRACT)
        with Locations((-38.392523364, -126.059946199)):
            Circle(SPLIT1_8_OUTLINE_R, mode=Mode.SUBTRACT)
        with Locations((39.694940335, -126.059946199)):
            Circle(SPLIT1_8_OUTLINE_R, mode=Mode.SUBTRACT)
    extrude(amount=SPLIT1_8_DEPTH)


with BuildPart() as cut_extrude11_tool:
    # Sketch37 → Cut-Extrude11 (new body)
    with BuildSketch(Plane.XZ.offset(10)):
        with Locations(Location((-120.938694043, -92.359352318, 0), (0, 0, 270))):
            Circle(SKETCH37_R)
        with Locations(Location((-38.392523364, -92.359352318, 0), (0, 0, 270))):
            Circle(SKETCH37_R_2)
        with Locations(Location((39.694940335, -92.359352318, 0), (0, 0, 270))):
            Circle(SKETCH37_R)
        with Locations(Location((-120.938694043, 126.059946199, 0), (0, 0, 270))):
            Circle(SKETCH37_R_3)
        with Locations(Location((-38.392523364, 126.059946199, 0), (0, 0, 270))):
            Circle(SKETCH37_R_3)
        with Locations(Location((39.694940335, 126.059946199, 0), (0, 0, 270))):
            Circle(SKETCH37_R_3)
    extrude(amount=-CUT_EXTRUDE11_DEPTH)


with BuildPart() as part_1:
    add(part.part)

    # Cut-Extrude11: cut by cut_extrude11_tool
    add(cut_extrude11_tool.part, mode=Mode.SUBTRACT)


with BuildPart() as body_2_1:
    add(body_2.part)

    # Cut-Extrude11: cut by cut_extrude11_tool
    add(cut_extrude11_tool.part, mode=Mode.SUBTRACT)


with BuildPart() as body_3_1:
    add(body_3.part)

    # Cut-Extrude11: cut by cut_extrude11_tool
    add(cut_extrude11_tool.part, mode=Mode.SUBTRACT)


solid = Compound([part_1.part, body_2_1.part, body_3_1.part])
